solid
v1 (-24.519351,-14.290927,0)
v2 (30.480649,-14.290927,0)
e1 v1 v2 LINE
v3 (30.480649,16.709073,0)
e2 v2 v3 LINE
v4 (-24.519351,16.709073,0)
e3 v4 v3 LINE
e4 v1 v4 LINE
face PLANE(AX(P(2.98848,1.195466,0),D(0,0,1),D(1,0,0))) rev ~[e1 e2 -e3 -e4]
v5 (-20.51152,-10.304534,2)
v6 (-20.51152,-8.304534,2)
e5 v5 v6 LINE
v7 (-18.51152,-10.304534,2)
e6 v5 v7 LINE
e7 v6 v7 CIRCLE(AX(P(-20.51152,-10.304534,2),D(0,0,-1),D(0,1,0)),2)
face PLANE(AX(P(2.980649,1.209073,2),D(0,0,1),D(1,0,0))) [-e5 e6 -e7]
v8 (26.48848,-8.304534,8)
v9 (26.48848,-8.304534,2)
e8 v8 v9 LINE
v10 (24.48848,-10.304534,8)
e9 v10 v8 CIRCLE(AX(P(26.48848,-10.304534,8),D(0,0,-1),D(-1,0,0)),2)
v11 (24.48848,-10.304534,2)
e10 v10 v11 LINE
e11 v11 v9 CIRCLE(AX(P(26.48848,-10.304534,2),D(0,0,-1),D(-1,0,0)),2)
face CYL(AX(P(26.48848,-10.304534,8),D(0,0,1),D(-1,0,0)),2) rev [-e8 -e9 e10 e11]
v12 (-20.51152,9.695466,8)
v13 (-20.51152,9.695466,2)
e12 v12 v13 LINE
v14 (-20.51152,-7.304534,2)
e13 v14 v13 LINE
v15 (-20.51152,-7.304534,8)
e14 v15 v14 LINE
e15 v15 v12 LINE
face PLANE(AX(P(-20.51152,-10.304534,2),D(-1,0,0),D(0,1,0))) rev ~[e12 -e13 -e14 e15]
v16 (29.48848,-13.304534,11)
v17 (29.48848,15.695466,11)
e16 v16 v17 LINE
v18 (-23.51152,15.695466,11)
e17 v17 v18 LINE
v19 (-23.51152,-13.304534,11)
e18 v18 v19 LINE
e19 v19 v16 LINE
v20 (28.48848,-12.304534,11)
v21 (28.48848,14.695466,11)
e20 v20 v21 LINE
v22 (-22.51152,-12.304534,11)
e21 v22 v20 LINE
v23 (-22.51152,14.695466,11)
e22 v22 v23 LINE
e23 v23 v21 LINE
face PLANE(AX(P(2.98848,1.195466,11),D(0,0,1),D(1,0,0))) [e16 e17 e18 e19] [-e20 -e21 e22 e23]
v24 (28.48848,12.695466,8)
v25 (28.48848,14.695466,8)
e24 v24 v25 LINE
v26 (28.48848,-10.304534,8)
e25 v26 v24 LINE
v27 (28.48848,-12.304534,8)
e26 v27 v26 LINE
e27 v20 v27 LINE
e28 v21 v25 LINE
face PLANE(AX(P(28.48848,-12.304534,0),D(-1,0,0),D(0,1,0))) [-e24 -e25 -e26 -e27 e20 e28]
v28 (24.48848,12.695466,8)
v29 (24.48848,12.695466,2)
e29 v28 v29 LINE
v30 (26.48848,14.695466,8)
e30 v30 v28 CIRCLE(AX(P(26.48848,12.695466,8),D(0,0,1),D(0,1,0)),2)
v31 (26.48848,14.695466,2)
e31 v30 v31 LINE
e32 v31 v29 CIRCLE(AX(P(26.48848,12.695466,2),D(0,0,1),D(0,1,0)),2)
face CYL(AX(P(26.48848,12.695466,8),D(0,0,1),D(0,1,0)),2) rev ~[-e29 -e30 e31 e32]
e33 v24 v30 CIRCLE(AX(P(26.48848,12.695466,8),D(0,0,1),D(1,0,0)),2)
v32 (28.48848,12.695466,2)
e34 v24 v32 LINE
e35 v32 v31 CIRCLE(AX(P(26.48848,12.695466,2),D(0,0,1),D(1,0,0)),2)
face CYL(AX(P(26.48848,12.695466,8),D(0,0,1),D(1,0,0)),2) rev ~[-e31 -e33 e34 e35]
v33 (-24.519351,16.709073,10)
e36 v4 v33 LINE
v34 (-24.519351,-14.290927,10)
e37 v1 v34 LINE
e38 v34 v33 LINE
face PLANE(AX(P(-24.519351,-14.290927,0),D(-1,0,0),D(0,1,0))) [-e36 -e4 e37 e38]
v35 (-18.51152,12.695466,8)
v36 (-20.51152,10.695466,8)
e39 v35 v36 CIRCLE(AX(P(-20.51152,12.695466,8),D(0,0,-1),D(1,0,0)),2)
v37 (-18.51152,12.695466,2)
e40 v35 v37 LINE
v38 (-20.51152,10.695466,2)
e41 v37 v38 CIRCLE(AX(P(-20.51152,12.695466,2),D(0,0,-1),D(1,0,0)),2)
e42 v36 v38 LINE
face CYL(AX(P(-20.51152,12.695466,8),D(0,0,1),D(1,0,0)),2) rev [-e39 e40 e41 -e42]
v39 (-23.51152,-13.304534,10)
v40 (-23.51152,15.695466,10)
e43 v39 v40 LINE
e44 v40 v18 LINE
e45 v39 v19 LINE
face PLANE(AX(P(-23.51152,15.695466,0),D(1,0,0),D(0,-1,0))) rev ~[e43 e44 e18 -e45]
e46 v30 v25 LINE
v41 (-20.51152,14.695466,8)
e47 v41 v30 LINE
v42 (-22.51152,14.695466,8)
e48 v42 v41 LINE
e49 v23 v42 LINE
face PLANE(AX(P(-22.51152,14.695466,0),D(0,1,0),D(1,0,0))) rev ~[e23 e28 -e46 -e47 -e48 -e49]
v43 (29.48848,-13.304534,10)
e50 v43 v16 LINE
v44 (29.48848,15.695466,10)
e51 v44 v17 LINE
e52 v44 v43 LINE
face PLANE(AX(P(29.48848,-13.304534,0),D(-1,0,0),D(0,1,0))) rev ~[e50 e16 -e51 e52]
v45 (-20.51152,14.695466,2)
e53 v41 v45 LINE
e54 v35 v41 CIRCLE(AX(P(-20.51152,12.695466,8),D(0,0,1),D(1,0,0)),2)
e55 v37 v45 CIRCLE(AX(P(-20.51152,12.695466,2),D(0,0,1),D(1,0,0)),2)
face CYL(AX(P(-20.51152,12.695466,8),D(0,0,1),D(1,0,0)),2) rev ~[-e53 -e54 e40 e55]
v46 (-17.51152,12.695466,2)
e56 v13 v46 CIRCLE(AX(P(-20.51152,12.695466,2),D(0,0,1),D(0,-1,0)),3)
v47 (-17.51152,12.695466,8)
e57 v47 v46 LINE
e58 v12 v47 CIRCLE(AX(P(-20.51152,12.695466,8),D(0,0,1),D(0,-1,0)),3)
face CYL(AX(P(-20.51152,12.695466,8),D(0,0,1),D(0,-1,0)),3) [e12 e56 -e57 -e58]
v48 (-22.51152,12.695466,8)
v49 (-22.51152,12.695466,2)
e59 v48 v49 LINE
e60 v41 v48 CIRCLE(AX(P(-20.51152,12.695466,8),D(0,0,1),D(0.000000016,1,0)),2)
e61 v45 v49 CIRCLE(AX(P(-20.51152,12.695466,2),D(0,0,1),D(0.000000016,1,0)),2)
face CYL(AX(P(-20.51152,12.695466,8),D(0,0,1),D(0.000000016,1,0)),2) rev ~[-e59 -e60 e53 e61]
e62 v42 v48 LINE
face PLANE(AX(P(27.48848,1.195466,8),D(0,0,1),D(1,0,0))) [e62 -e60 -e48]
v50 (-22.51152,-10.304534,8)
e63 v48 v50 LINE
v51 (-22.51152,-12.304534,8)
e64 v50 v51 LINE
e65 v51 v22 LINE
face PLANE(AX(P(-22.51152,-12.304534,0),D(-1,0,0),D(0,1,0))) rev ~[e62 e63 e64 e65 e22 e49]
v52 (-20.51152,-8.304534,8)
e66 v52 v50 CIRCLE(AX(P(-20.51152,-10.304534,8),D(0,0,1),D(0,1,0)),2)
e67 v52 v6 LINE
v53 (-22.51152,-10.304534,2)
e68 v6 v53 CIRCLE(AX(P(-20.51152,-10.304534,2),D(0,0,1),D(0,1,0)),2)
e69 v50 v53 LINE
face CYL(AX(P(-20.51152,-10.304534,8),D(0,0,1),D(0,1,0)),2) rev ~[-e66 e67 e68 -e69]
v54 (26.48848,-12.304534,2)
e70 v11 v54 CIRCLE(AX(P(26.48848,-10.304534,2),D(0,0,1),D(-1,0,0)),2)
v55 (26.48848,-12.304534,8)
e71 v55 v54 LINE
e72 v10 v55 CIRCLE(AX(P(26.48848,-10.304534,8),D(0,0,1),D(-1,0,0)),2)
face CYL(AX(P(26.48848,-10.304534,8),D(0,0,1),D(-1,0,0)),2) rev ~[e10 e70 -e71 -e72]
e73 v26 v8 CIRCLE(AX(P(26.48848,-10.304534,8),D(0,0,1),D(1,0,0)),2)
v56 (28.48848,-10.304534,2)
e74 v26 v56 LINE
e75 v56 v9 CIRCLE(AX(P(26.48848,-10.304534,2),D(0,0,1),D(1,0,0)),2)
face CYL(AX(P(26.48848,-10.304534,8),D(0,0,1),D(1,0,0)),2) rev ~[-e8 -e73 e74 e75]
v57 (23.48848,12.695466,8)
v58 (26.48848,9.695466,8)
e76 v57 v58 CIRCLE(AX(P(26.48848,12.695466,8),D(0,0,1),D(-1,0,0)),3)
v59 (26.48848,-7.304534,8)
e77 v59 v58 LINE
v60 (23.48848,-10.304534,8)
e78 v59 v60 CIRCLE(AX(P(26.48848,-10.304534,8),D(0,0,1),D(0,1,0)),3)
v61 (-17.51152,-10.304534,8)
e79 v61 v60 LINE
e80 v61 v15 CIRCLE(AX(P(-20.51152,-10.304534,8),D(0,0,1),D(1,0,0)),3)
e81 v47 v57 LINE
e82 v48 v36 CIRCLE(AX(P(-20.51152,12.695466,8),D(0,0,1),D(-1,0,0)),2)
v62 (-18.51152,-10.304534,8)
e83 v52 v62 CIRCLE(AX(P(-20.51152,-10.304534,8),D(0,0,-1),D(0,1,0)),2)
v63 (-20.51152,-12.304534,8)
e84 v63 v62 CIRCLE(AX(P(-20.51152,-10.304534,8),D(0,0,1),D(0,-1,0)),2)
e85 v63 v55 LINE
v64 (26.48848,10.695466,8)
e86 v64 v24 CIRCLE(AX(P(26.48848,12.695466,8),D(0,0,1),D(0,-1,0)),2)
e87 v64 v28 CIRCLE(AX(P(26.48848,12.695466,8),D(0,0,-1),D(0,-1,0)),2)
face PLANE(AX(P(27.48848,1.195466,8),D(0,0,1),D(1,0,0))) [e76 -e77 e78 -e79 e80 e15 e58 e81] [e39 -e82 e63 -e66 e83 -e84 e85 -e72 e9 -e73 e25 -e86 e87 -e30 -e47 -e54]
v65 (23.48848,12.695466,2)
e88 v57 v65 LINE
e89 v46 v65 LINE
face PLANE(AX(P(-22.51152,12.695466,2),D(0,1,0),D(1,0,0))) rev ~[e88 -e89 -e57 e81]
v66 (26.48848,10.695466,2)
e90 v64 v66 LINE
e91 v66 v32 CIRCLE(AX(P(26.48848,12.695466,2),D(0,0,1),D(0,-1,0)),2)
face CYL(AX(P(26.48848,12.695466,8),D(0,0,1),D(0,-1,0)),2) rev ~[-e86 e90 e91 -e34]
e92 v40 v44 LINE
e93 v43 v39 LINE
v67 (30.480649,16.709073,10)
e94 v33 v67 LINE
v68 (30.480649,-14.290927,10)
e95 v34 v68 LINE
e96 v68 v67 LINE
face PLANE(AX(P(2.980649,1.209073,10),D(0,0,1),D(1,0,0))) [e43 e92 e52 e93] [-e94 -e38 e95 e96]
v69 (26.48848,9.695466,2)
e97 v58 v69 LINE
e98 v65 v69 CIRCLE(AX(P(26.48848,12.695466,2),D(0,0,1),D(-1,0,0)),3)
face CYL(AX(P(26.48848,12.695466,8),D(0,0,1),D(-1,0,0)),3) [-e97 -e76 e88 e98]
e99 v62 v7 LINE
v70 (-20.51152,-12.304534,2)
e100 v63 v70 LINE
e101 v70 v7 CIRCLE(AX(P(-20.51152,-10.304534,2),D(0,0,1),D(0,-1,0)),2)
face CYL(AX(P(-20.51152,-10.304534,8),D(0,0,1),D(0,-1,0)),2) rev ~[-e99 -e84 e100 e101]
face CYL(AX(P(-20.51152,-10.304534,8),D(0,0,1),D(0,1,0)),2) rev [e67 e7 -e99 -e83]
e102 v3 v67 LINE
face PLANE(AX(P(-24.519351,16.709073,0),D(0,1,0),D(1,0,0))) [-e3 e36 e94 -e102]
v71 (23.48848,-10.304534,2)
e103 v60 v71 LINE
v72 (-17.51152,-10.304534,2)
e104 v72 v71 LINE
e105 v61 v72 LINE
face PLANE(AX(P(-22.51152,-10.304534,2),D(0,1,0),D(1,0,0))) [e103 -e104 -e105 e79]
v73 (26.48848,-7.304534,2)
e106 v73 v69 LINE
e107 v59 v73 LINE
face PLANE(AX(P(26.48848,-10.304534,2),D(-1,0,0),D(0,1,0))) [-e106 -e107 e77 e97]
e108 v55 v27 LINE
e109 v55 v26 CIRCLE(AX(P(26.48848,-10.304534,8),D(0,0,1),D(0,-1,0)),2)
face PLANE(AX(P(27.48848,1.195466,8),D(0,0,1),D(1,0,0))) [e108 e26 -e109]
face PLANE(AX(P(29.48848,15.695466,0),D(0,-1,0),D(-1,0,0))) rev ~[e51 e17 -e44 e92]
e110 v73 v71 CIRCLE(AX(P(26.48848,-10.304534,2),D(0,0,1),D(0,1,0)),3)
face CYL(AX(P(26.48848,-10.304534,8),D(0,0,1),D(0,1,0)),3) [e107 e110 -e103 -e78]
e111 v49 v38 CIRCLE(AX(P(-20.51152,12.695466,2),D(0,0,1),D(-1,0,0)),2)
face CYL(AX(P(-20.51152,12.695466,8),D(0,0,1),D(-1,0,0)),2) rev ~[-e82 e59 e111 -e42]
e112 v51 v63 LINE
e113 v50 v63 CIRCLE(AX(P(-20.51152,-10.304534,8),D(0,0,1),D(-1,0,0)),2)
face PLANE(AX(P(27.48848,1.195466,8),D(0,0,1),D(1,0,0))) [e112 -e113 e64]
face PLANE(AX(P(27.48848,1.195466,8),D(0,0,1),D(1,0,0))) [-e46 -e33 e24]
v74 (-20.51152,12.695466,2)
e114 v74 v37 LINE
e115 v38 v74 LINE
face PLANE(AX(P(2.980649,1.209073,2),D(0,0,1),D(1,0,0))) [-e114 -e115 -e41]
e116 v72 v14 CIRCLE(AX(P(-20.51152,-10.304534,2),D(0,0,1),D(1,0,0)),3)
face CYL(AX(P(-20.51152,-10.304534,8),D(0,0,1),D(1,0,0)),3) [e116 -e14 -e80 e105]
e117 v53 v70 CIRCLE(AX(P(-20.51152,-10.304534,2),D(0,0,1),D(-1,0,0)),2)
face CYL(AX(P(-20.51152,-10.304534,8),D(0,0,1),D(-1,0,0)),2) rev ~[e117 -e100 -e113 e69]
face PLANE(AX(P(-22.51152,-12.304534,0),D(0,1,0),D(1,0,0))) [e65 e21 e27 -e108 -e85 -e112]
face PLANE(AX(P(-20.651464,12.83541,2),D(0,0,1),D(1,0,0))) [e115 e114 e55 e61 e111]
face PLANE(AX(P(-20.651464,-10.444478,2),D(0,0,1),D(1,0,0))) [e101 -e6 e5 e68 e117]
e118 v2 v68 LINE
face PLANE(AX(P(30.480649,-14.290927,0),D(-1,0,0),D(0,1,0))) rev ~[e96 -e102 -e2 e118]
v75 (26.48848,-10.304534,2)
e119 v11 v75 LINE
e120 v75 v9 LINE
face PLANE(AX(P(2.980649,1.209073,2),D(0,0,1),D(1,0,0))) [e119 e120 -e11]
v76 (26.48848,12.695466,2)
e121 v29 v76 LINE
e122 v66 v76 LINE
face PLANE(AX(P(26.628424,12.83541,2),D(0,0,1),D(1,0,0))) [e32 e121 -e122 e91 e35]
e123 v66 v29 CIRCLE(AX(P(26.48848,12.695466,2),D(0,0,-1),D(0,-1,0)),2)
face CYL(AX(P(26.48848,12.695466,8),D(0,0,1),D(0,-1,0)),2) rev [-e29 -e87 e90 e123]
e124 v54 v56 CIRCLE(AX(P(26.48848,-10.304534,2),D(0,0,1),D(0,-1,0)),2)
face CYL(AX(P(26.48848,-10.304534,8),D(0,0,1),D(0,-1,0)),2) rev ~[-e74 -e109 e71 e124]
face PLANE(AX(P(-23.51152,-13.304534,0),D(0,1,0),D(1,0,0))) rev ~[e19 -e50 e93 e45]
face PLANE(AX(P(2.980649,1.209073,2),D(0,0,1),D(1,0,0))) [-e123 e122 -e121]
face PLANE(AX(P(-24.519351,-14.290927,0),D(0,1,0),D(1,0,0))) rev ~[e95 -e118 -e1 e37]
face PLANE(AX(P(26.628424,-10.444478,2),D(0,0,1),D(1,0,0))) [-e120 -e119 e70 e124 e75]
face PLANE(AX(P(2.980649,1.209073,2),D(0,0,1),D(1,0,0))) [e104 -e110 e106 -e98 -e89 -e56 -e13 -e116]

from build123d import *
from build123d import SkipClean  # not in build123d's __all__

# Parameters (mm, degrees)
F0_W      = 55
F0_H      = 31
F2_DEPTH  = 10
F1_W      = 51
F1_H      = 27
F3_DEPTH  = 11
F4_DEPTH  = 8
F5_W      = 51
F5_H      = 2
F6_DEPTH  = 6
F7_W      = 2
F7_H      = 23
F8_DEPTH  = 6
F10_DEPTH = 6
F11_DEPTH = 6


with BuildPart() as f2:
    # F0 (on Top) → F2 (new body)
    with BuildSketch(Plane.XY):
        with Locations((2.9806493223, 1.209073022)):
            Rectangle(F0_W, F0_H)
    extrude(amount=F2_DEPTH)

    # F1 (on face) → F3 (join)
    with BuildSketch(Plane.XY):
        Polygon((-22.5115198195, 15.6954657286), (-23.5115198195, 15.6954657286), (-23.5115198195, -13.3045342714), (29.4884801805, -13.3045342714), (29.4884801805, 15.6954657286), align=None)
        with Locations((2.9884801805, 1.1954657286)):
            Rectangle(F1_W, F1_H, mode=Mode.SUBTRACT)
    extrude(amount=F3_DEPTH)

    # F4 (cut): a face of the model
    f4_faces = [f2.faces().sort_by_distance(p)[0] for p in [
        (2.9884801805, 1.1954657286, 10),
    ]]
    extrude(f4_faces, amount=-F4_DEPTH, mode=Mode.SUBTRACT)

    # F5 (on face) → F6 (join)
    with BuildSketch(Plane.XY.offset(2)):
        with Locations((2.9884801805, 13.6954657286)):
            Rectangle(F5_W, F5_H)
        with Locations((2.9884801805, -11.3045342714)):
            Rectangle(F5_W, F5_H)
    extrude(amount=F6_DEPTH)

    # F7 (on face) → F8 (join)
    with BuildSketch(Plane.XY.offset(2)):
        with Locations((27.4884801805, 1.1954657286)):
            Rectangle(F7_W, F7_H)
        with Locations((-21.5115198195, 1.1954657286)):
            Rectangle(F7_W, F7_H)
    extrude(amount=F8_DEPTH)

    # F9 (on face) → F10 (join)
    with BuildSketch(Plane.XY.offset(8)):
        with BuildLine():
            ThreePointArc((-20.5115198195, 9.6954657286), (-18.3901994759, 10.5741453851), (-17.5115198195, 12.6954657286))
            Line((-17.5115198195, 12.6954657286), (-18.5115198195, 12.6954657286))
            ThreePointArc((-18.5115198195, 12.6954657286), (-19.0973062571, 11.2812521663), (-20.5115198195, 10.6954657286))
            Line((-20.5115198195, 10.6954657286), (-20.5115198195, 9.6954657286))
        make_face()
        with BuildLine():
            ThreePointArc((-17.5115198195, -10.3045342714), (-18.3901994759, -8.1832139278), (-20.5115198195, -7.3045342714))
            Line((-20.5115198195, -7.3045342714), (-20.5115198195, -8.3045342714))
            ThreePointArc((-20.5115198195, -8.3045342714), (-19.0973062571, -8.890320709), (-18.5115198195, -10.3045342714))
            Line((-18.5115198195, -10.3045342714), (-17.5115198195, -10.3045342714))
        make_face()
        with BuildLine():
            Line((26.4884801805, -8.3045342714), (26.4884801805, -7.3045342714))
            ThreePointArc((26.4884801805, -7.3045342714), (24.3671598369, -8.1832139278), (23.4884801805, -10.3045342714))
            Line((23.4884801805, -10.3045342714), (24.4884801805, -10.3045342714))
            ThreePointArc((24.4884801805, -10.3045342714), (25.0742666181, -8.890320709), (26.4884801805, -8.3045342714))
        make_face()
        with BuildLine():
            Line((24.4884801805, 12.6954657286), (23.4884801805, 12.6954657286))
            ThreePointArc((23.4884801805, 12.6954657286), (24.3671598369, 10.5741453851), (26.4884801805, 9.6954657286))
            Line((26.4884801805, 9.6954657286), (26.4884801805, 10.6954657286))
            ThreePointArc((26.4884801805, 10.6954657286), (25.0742666181, 11.2812521663), (24.4884801805, 12.6954657286))
        make_face()
    extrude(amount=-F10_DEPTH)

    # F9 (on face) → F11 (cut)
    with BuildSketch(Plane.XY.offset(8)):
        with BuildLine():
            Line((-20.5115198195, 12.6954657286), (-18.5115198195, 12.6954657286))
            ThreePointArc((-18.5115198195, 12.6954657286), (-19.0973062461, 14.10967928), (-20.5115197883, 14.6954657286))
            ThreePointArc((-20.5115197883, 14.6954657286), (-21.9257333708, 14.1096793021), (-22.5115198195, 12.6954657286))
            ThreePointArc((-22.5115198195, 12.6954657286), (-21.9257333819, 11.2812521663), (-20.5115198195, 10.6954657286))
            Line((-20.5115198195, 10.6954657286), (-20.5115198195, 12.6954657286))
        make_face()
        with BuildLine():
            Line((-20.5115198195, -10.3045342714), (-20.5115198195, -8.3045342714))
            ThreePointArc((-20.5115198195, -8.3045342714), (-21.9257333819, -8.890320709), (-22.5115198195, -10.3045342714))
            ThreePointArc((-22.5115198195, -10.3045342714), (-21.9257333819, -11.7187478337), (-20.5115198195, -12.3045342714))
            ThreePointArc((-20.5115198195, -12.3045342714), (-19.0973062571, -11.7187478337), (-18.5115198195, -10.3045342714))
            Line((-18.5115198195, -10.3045342714), (-20.5115198195, -10.3045342714))
        make_face()
        with BuildLine():
            ThreePointArc((28.4884801805, -10.3045342714), (27.9026937429, -8.890320709), (26.4884801805, -8.3045342714))
            Line((26.4884801805, -8.3045342714), (26.4884801805, -10.3045342714))
            Line((26.4884801805, -10.3045342714), (24.4884801805, -10.3045342714))
            ThreePointArc((24.4884801805, -10.3045342714), (25.0742666181, -11.7187478337), (26.4884801805, -12.3045342714))
            ThreePointArc((26.4884801805, -12.3045342714), (27.9026937429, -11.7187478337), (28.4884801805, -10.3045342714))
        make_face()
        with BuildLine():
            ThreePointArc((26.4884801805, 14.6954657286), (25.0742666181, 14.109679291), (24.4884801805, 12.6954657286))
            Line((24.4884801805, 12.6954657286), (26.4884801805, 12.6954657286))
            Line((26.4884801805, 12.6954657286), (26.4884801805, 10.6954657286))
            ThreePointArc((26.4884801805, 10.6954657286), (27.9026937429, 11.2812521663), (28.4884801805, 12.6954657286))
            ThreePointArc((28.4884801805, 12.6954657286), (27.9026937429, 14.109679291), (26.4884801805, 14.6954657286))
        make_face()
    with SkipClean():  # cleaning this boolean's faces spoils the solid; the shape is the same uncleaned
        extrude(amount=-F11_DEPTH, mode=Mode.SUBTRACT)


solid = f2.part
